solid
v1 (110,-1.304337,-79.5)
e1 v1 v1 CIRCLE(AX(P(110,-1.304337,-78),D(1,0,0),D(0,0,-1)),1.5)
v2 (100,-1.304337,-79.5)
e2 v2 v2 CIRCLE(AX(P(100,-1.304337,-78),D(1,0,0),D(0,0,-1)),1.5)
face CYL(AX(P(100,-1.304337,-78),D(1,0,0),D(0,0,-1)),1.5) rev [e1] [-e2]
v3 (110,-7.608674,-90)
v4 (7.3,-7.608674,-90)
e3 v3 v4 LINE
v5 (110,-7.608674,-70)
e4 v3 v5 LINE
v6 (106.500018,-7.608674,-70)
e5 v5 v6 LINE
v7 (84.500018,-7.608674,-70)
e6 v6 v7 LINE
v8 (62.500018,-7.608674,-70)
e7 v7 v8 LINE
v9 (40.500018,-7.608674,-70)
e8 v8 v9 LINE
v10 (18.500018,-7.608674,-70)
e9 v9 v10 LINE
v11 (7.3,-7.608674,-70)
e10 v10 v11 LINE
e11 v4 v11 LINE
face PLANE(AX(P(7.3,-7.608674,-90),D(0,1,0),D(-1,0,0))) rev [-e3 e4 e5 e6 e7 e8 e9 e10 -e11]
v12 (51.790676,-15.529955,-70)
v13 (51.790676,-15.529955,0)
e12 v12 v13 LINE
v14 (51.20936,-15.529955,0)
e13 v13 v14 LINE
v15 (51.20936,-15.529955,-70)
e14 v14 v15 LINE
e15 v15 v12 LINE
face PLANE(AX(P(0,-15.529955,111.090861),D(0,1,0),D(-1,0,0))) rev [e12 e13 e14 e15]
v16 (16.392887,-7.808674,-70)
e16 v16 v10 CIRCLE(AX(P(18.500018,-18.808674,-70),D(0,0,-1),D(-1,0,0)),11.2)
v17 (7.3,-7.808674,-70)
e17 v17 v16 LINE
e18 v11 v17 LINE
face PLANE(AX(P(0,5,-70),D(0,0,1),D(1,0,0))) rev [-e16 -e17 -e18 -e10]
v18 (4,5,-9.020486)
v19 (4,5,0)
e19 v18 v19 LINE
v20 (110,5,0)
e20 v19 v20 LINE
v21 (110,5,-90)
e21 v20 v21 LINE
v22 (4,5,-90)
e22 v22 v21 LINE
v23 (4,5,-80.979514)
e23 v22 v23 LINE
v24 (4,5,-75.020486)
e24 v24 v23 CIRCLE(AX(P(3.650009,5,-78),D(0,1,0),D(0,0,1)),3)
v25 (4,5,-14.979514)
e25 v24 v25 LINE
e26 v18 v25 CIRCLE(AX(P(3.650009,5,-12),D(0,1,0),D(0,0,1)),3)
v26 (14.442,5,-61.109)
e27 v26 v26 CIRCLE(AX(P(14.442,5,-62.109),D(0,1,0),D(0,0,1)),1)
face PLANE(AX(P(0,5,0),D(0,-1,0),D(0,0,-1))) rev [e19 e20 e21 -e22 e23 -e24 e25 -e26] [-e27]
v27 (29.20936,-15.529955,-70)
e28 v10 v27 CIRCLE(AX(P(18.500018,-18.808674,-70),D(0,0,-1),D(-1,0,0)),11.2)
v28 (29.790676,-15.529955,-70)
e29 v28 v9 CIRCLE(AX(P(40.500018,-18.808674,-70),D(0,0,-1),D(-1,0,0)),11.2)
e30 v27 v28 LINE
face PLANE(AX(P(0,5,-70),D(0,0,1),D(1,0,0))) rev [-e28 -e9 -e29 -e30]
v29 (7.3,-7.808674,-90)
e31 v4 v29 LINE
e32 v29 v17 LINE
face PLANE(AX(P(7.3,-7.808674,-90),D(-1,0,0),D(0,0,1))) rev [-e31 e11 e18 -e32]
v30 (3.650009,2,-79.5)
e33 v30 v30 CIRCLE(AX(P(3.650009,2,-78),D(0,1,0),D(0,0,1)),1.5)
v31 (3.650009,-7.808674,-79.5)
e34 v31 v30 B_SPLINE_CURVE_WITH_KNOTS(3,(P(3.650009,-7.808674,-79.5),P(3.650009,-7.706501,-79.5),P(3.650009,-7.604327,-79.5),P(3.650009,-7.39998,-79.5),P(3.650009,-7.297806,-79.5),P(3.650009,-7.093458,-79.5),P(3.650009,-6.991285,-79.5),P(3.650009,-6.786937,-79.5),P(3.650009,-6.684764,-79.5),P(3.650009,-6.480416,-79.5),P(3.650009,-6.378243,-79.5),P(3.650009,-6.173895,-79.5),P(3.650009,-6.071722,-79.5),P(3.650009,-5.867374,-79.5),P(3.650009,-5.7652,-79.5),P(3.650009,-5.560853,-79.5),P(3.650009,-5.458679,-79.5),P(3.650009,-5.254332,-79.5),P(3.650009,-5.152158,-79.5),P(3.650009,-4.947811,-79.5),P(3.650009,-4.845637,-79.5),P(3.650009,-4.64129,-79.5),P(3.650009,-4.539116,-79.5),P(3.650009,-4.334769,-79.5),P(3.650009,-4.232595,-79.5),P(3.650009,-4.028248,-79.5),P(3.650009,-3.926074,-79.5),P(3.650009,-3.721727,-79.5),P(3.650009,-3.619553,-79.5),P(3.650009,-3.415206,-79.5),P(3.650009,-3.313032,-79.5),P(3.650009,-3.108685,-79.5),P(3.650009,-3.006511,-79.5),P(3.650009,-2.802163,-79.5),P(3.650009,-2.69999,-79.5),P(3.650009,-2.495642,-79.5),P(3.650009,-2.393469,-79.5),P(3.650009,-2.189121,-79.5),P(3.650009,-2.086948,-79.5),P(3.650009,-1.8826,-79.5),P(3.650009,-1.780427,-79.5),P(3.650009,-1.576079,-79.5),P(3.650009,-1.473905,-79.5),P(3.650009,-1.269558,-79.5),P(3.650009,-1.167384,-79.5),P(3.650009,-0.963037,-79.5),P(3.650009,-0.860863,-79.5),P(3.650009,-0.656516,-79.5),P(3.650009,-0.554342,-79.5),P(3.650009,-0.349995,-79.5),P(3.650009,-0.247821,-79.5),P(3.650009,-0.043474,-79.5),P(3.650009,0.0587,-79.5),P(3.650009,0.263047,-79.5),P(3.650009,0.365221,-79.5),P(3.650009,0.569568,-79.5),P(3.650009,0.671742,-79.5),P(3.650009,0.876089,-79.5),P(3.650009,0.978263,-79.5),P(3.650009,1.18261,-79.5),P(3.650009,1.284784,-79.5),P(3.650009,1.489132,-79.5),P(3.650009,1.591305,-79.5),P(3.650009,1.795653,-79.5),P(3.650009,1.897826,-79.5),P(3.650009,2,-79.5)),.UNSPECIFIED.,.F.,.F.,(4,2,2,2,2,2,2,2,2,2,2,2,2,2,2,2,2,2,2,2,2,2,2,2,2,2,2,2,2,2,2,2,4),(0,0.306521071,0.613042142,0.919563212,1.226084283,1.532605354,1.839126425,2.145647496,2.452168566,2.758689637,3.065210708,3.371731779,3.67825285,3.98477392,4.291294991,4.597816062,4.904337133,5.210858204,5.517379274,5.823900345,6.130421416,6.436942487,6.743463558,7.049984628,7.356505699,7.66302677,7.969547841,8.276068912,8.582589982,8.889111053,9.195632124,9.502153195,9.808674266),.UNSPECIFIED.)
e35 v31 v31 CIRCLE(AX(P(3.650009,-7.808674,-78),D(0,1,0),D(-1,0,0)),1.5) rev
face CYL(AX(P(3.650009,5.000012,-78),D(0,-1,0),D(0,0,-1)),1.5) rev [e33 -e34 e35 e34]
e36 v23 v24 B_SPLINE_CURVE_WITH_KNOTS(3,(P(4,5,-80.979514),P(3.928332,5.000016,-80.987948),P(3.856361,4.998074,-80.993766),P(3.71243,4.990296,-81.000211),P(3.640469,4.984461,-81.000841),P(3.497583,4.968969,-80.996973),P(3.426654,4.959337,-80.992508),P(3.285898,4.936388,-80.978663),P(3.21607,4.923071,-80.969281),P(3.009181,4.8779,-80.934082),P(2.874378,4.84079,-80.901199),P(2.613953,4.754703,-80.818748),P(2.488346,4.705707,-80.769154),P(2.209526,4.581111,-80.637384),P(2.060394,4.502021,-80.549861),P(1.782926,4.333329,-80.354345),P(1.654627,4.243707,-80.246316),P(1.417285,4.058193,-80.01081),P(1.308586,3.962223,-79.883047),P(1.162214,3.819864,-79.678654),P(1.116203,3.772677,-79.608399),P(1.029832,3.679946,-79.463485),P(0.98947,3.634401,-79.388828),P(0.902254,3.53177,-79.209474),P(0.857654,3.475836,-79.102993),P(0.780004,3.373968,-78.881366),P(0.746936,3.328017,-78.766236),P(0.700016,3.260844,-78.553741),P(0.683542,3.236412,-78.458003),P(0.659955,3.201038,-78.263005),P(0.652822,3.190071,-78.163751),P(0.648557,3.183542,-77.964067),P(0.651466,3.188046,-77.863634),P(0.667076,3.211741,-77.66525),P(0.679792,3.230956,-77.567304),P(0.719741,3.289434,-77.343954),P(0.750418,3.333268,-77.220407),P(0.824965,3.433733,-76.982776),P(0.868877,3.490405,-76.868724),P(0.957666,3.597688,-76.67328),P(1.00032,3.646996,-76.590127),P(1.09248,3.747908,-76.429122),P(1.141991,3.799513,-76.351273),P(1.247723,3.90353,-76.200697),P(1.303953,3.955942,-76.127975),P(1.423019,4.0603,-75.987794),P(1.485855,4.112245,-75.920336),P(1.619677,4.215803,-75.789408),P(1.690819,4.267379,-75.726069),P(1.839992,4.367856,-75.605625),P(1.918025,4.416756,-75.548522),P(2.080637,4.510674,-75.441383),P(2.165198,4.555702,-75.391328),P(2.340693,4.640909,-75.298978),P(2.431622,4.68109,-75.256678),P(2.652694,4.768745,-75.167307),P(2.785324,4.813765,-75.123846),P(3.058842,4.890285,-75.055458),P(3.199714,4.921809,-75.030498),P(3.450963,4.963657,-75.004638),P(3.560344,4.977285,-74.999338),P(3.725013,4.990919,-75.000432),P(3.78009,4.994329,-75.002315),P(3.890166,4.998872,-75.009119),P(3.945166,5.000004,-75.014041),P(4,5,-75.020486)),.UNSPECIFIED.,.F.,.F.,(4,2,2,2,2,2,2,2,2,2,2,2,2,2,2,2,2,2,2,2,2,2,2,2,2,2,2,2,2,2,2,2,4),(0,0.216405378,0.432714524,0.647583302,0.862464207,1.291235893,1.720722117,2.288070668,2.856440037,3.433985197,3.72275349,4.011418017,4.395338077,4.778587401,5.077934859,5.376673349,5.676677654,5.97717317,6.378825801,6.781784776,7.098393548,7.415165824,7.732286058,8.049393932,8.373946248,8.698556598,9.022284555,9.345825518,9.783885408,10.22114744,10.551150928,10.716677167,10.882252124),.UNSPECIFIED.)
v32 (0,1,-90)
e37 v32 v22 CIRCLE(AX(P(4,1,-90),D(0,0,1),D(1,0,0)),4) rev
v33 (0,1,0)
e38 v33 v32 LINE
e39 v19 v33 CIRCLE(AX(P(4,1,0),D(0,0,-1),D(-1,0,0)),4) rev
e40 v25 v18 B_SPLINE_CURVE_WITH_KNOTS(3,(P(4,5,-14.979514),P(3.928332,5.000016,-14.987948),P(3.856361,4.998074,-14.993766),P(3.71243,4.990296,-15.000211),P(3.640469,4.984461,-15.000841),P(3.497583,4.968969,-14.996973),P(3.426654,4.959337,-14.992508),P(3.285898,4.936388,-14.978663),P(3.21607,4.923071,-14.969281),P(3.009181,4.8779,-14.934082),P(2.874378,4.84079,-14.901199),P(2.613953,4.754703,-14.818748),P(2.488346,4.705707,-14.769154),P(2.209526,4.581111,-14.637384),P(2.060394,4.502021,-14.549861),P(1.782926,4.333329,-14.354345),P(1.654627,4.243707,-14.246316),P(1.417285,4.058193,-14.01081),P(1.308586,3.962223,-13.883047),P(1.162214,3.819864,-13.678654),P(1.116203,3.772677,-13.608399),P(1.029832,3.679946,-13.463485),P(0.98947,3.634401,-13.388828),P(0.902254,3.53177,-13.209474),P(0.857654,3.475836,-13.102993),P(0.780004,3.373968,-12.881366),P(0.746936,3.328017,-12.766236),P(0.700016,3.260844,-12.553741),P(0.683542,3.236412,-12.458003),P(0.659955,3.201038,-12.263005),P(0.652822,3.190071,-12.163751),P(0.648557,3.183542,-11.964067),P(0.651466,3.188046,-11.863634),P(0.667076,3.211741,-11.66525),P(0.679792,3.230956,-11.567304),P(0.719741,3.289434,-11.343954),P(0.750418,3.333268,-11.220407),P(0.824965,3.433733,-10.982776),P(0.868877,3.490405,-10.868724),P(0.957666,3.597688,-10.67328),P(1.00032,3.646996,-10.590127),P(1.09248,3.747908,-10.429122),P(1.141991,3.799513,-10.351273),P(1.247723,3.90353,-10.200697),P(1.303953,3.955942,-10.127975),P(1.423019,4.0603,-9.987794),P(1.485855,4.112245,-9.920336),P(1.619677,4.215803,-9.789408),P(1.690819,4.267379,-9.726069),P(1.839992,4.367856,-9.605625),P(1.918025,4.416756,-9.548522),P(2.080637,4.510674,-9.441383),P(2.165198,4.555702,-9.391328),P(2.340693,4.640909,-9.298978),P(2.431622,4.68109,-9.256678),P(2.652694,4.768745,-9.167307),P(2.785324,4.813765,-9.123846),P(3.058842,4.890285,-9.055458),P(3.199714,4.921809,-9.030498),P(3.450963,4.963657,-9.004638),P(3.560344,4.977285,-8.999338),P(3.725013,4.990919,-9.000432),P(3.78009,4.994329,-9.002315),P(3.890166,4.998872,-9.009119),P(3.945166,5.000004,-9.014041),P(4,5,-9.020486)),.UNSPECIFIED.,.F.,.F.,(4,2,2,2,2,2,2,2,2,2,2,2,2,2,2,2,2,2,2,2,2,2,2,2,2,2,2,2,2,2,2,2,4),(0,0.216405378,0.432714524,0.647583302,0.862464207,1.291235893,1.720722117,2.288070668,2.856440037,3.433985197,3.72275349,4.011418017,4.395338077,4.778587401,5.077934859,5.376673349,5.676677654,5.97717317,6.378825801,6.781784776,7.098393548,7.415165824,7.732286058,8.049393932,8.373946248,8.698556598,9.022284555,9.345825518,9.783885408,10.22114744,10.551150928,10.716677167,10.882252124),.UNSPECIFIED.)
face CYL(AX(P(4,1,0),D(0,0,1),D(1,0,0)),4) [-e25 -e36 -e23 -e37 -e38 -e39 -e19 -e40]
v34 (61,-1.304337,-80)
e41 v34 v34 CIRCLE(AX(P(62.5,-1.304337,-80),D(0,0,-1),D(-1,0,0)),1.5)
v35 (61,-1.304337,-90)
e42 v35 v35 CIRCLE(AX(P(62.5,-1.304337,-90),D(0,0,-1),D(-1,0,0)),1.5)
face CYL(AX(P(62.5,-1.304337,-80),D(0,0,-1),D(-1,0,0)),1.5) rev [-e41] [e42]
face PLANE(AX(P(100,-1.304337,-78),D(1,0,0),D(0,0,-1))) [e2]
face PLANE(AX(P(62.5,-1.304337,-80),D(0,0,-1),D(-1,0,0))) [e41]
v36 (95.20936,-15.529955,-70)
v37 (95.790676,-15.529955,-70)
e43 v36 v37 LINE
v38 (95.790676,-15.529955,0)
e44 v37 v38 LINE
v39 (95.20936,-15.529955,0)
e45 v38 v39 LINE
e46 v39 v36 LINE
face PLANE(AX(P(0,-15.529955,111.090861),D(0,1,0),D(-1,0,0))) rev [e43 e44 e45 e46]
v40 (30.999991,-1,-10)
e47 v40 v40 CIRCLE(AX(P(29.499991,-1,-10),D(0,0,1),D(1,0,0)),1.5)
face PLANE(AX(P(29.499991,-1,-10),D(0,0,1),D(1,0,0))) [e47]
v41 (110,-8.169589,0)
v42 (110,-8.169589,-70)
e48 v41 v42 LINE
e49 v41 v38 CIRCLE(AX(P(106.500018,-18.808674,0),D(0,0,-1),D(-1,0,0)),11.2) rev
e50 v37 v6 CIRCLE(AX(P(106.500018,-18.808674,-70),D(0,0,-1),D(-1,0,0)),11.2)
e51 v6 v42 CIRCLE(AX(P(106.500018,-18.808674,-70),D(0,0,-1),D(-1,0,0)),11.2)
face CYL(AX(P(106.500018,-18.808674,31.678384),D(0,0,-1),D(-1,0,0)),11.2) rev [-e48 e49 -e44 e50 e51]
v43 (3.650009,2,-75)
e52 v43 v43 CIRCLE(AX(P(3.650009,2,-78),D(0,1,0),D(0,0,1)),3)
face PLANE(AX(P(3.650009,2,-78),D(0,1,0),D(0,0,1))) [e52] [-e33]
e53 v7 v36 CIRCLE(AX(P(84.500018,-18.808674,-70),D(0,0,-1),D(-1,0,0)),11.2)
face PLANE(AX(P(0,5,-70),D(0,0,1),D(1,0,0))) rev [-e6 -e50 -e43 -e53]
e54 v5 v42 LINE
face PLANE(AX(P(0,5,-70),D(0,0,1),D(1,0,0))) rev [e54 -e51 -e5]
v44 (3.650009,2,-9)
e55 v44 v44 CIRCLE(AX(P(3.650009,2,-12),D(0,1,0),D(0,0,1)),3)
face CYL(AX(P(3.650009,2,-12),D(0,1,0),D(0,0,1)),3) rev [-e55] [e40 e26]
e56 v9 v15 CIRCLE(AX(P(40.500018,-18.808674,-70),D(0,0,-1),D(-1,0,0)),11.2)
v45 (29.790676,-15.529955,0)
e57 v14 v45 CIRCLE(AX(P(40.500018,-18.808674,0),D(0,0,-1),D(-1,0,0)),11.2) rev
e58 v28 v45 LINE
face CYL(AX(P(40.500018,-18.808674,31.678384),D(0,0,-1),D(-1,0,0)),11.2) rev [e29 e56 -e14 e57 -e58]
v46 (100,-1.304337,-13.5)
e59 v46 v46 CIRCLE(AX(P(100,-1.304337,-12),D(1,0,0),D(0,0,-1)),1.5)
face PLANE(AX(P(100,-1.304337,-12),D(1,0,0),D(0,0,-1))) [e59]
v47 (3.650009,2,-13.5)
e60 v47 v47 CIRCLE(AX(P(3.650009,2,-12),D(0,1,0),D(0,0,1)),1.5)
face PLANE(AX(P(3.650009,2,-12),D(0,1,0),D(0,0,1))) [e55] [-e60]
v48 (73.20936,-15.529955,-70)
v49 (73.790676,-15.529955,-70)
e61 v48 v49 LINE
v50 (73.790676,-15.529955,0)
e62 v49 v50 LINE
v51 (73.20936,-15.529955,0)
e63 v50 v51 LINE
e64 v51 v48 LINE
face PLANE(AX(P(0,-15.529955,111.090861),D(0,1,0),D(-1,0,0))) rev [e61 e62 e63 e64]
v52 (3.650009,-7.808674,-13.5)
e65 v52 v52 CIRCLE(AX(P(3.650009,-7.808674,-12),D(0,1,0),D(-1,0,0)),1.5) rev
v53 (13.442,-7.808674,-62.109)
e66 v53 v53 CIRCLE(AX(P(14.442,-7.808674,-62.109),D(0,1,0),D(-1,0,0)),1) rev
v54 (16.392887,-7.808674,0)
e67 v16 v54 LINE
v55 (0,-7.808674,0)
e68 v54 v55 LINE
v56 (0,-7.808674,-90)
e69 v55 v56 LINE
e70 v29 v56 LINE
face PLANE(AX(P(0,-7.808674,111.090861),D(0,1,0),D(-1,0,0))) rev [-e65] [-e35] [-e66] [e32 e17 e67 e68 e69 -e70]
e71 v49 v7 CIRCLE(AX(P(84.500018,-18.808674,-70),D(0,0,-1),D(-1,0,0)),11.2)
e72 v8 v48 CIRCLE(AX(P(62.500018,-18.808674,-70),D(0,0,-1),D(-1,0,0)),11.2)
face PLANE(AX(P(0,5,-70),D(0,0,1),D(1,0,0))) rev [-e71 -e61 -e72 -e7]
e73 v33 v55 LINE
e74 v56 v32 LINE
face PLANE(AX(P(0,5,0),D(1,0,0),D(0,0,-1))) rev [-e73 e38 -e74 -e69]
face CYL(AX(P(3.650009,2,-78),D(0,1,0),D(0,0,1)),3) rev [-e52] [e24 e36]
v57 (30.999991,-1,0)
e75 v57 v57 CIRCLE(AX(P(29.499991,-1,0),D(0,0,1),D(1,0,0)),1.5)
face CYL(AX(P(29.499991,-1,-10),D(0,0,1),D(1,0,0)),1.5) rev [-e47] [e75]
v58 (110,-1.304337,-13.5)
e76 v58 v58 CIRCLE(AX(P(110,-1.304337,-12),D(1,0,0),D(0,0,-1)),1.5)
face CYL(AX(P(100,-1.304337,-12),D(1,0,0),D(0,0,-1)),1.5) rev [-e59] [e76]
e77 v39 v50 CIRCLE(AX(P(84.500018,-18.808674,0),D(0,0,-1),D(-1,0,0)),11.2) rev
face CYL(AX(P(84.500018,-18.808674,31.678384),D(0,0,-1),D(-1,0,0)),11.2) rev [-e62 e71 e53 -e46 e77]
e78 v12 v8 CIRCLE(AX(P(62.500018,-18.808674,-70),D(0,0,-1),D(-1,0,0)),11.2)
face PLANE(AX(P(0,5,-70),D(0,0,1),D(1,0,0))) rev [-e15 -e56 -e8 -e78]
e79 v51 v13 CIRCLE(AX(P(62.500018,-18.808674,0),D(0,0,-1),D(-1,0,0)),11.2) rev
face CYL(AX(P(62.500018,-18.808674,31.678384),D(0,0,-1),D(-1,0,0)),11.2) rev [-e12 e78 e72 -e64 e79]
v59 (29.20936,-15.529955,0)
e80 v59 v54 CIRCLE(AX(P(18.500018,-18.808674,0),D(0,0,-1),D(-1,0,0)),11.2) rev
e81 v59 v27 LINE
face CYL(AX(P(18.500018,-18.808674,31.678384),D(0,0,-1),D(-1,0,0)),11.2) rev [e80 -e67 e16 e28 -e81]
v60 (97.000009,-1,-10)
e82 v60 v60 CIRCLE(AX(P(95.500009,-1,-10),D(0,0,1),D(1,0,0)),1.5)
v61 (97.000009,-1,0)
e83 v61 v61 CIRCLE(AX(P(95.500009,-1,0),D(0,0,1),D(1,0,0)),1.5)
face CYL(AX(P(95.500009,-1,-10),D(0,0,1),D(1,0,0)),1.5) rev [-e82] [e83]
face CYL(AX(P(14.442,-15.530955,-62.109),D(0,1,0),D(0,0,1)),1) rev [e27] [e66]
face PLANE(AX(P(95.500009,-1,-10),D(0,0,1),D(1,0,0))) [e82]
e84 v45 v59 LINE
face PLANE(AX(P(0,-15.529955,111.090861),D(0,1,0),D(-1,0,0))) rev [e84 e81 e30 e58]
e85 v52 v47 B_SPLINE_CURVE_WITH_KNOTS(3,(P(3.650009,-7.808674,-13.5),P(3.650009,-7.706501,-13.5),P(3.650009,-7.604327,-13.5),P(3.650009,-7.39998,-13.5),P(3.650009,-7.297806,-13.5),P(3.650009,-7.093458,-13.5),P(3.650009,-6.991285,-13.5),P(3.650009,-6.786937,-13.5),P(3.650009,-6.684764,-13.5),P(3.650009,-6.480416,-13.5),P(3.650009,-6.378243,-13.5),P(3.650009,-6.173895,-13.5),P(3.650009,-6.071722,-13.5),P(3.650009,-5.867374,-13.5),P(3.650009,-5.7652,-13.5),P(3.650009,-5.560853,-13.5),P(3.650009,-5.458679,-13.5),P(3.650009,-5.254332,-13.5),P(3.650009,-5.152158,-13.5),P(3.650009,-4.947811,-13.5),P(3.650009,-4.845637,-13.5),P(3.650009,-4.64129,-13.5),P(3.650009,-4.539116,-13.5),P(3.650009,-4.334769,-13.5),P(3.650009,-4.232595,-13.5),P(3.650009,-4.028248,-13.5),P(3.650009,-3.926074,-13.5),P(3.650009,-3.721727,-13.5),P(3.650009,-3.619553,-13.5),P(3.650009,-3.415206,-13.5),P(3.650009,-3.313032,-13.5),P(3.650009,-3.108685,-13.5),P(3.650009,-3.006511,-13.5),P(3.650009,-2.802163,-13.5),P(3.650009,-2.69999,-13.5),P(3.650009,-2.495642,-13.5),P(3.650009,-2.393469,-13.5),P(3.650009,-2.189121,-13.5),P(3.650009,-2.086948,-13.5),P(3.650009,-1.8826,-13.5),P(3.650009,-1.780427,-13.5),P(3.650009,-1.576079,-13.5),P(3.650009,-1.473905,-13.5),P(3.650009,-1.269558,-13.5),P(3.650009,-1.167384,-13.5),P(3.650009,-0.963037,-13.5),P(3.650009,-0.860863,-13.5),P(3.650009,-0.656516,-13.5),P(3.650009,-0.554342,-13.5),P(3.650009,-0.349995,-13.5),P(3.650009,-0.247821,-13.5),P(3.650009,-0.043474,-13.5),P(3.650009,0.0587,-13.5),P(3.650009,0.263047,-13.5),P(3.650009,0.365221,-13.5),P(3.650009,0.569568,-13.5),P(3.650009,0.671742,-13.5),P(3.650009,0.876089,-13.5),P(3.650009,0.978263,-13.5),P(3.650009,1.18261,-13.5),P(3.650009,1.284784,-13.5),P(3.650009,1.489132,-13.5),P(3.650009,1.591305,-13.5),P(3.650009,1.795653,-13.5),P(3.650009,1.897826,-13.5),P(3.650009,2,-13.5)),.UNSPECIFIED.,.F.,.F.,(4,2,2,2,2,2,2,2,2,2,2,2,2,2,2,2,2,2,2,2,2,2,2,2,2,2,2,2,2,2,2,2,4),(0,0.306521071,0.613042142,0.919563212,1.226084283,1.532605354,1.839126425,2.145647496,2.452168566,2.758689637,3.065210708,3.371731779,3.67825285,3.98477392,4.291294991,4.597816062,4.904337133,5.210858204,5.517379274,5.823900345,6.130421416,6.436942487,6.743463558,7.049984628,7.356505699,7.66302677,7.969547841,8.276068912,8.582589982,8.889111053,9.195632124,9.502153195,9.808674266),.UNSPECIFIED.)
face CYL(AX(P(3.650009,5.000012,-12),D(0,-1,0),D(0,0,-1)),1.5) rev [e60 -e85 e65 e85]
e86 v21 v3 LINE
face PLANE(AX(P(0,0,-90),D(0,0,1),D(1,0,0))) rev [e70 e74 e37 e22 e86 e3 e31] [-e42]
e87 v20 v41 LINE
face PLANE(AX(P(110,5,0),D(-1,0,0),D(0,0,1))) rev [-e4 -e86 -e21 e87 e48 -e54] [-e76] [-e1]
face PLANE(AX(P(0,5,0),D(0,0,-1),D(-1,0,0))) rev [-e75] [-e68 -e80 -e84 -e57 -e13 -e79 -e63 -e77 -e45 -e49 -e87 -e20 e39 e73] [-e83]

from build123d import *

# Parameters (mm, degrees)
SKETCH_1_W                      = 110
SKETCH_1_H                      = 70
EXTRUDE_1_DEPTH                 = 5
EXTRUDE_2_DEPTH                 = 70
CUT_EXTRUDE_2_DEPTH             = 70
EXTRUDE_3_DEPTH                 = 20
SKETCH_5_R                      = 1.5
CUT_EXTRUDE_3_DEPTH             = 10
SKETCH_6_R                      = 1.5
CUT_EXTRUDE_4_DEPTH             = 10
CUT_EXTRUDE_5_REACH             = 145.602
SKETCH_7_R                      = 1.5
CUT_EXTRUDE_5_DIRECTION_2_DEPTH = 144.601807274
SKETCH_8_R                      = 3
CUT_EXTRUDE_6_DEPTH             = 3
CUT_EXTRUDE_7_REACH             = 145.602
SKETCH_9_R                      = 1
FILLET_1_R                      = 4
SKETCH_10_R                     = 1.5
CUT_EXTRUDE_8_DEPTH             = 10


with BuildPart() as part:
    # 草图1 → 凸台-拉伸1 (new body)
    with BuildSketch(Plane(origin=(0, 0, 0), x_dir=(1, 0, 0), z_dir=(0, 1, 0))):
        with Locations((55, 35)):
            Rectangle(SKETCH_1_W, SKETCH_1_H)
    extrude(amount=EXTRUDE_1_DEPTH)

    # 草图2 → 凸台-拉伸2 (add)
    with BuildSketch(Plane(origin=(0, 0, -70), x_dir=(-1, 0, 0), z_dir=(0, 0, -1))):
        with BuildLine():
            Line((0, 0), (-110, 0))
            Line((-110, 0), (-110, -8.38034143))
            ThreePointArc((-110, -8.38034143), (-101.497088177, -9.012210946), (-96.000017961, -15.529955003))
            Line((-96.000017961, -15.529955003), (-94.999994392, -15.529955003))
            ThreePointArc((-94.999994392, -15.529955003), (-84.5, -7.808692226), (-74.000005608, -15.529955003))
            Line((-74.000005608, -15.529955003), (-72.999994392, -15.529955003))
            ThreePointArc((-72.999994392, -15.529955003), (-62.5, -7.808692226), (-52.000005608, -15.529955003))
            Line((-52.000005608, -15.529955003), (-50.999994392, -15.529955003))
            ThreePointArc((-50.999994392, -15.529955003), (-40.5, -7.808692226), (-30.000005608, -15.529955003))
            Line((-30.000005608, -15.529955003), (-29.000017961, -15.529955003))
            ThreePointArc((-29.000017961, -15.529955003), (-25.01669227, -9.946792076), (-18.500017961, -7.808674266))
            Line((-18.500017961, -7.808674266), (0, -7.808674266))
            Line((0, -7.808674266), (0, 0))
        make_face()
    extrude(amount=-EXTRUDE_2_DEPTH)

    # 草图3 → 切除-拉伸2 (cut)
    with BuildSketch(Plane(origin=(0, 0, -70), x_dir=(-1, 0, 0), z_dir=(0, 0, -1))):
        with BuildLine():
            Line((-96.000017961, -15.529955003), (-95.790676244, -15.529955003))
            ThreePointArc((-95.790676244, -15.529955003), (-101.348565543, -8.863698751), (-110, -8.169589449))
            Line((-110, -8.169589449), (-110, -8.38034143))
            ThreePointArc((-110, -8.38034143), (-101.497088177, -9.012210946), (-96.000017961, -15.529955003))
        make_face()
        with BuildLine():
            ThreePointArc((-73.790676244, -15.529955003), (-84.500017961, -7.608674266), (-95.209359677, -15.529955003))
            Line((-95.209359677, -15.529955003), (-94.999994392, -15.529955003))
            ThreePointArc((-94.999994392, -15.529955003), (-84.5, -7.808692226), (-74.000005608, -15.529955003))
            Line((-74.000005608, -15.529955003), (-73.790676244, -15.529955003))
        make_face()
        with BuildLine():
            ThreePointArc((-51.790676244, -15.529955003), (-62.500017961, -7.608674266), (-73.209359677, -15.529955003))
            Line((-73.209359677, -15.529955003), (-72.999994392, -15.529955003))
            ThreePointArc((-72.999994392, -15.529955003), (-62.5, -7.808692226), (-52.000005608, -15.529955003))
            Line((-52.000005608, -15.529955003), (-51.790676244, -15.529955003))
        make_face()
        with BuildLine():
            ThreePointArc((-29.790676244, -15.529955003), (-40.500017961, -7.608674266), (-51.209359677, -15.529955003))
            Line((-51.209359677, -15.529955003), (-50.999994392, -15.529955003))
            ThreePointArc((-50.999994392, -15.529955003), (-40.5, -7.808692226), (-30.000005608, -15.529955003))
            Line((-30.000005608, -15.529955003), (-29.790676244, -15.529955003))
        make_face()
        with BuildLine():
            Line((-18.500017961, -7.808674266), (-16.39288721, -7.808674266))
            ThreePointArc((-16.39288721, -7.808674266), (-24.279641861, -9.215137505), (-29.209359677, -15.529955003))
            Line((-29.209359677, -15.529955003), (-29.000017961, -15.529955003))
            ThreePointArc((-29.000017961, -15.529955003), (-25.01669227, -9.946792076), (-18.500017961, -7.808674266))
        make_face()
    extrude(amount=-CUT_EXTRUDE_2_DEPTH, mode=Mode.SUBTRACT)

    # 草图4 → 凸台-拉伸3 (add)
    with BuildSketch(Plane(origin=(0, 0, -70), x_dir=(-1, 0, 0), z_dir=(0, 0, -1))):
        Polygon((0, 5), (-110, 5), (-110, -7.608674266), (-7.3, -7.608674266), (-7.3, -7.808674266), (0, -7.808674266), (0, -7.608674266), align=None)
    extrude(amount=EXTRUDE_3_DEPTH)

    # 草图5 → 切除-拉伸3 (cut)
    with BuildSketch(Plane.XY):
        with Locations((95.50000898, -1)):
            Circle(SKETCH_5_R)
        with Locations((29.49999102, -1)):
            Circle(SKETCH_5_R)
    extrude(amount=-CUT_EXTRUDE_3_DEPTH, mode=Mode.SUBTRACT)

    # 草图6 → 切除-拉伸4 (cut)
    with BuildSketch(Plane(origin=(110, 0, 0), x_dir=(0, 0, -1), z_dir=(1, 0, 0))):
        with Locations((78, -1.304337133)):
            Circle(SKETCH_6_R)
        with Locations((12, -1.304337133)):
            Circle(SKETCH_6_R)
    extrude(amount=-CUT_EXTRUDE_4_DEPTH, mode=Mode.SUBTRACT)

    # 草图7 → 切除-拉伸5 (cut, up to next)
    with BuildSketch(Plane(origin=(0, 5, 0), x_dir=(1, 0, 0), z_dir=(0, 1, 0)), mode=Mode.PRIVATE) as cut_extrude_5_sk1:
        with Locations(Location((3.65000898, 78, 0), (0, 0, 90))):
            Circle(SKETCH_7_R)
    cut_extrude_5_tool1 = extrude(cut_extrude_5_sk1.sketch, amount=-CUT_EXTRUDE_5_REACH, mode=Mode.PRIVATE) & part.part
    # 草图7 → 切除-拉伸5 (cut, up to next)
    with BuildSketch(Plane(origin=(0, 5, 0), x_dir=(1, 0, 0), z_dir=(0, 1, 0)), mode=Mode.PRIVATE) as cut_extrude_5_sk2:
        with Locations(Location((3.65000898, 12, 0), (0, 0, 90))):
            Circle(SKETCH_7_R)
    cut_extrude_5_tool2 = extrude(cut_extrude_5_sk2.sketch, amount=-CUT_EXTRUDE_5_REACH, mode=Mode.PRIVATE) & part.part
    add(cut_extrude_5_tool1.solids().sort_by_distance((3.650009, 5, -78))[0], mode=Mode.SUBTRACT)
    add(cut_extrude_5_tool2.solids().sort_by_distance((3.650009, 5, -12))[0], mode=Mode.SUBTRACT)

    # 草图7 → 切除-拉伸5 direction 2 (cut)
    with BuildSketch(Plane(origin=(0, 5, 0), x_dir=(1, 0, 0), z_dir=(0, 1, 0))):
        with Locations(Location((3.65000898, 78, 0), (0, 0, 90))):
            Circle(SKETCH_7_R)
        with Locations(Location((3.65000898, 12, 0), (0, 0, 90))):
            Circle(SKETCH_7_R)
    extrude(amount=CUT_EXTRUDE_5_DIRECTION_2_DEPTH, mode=Mode.SUBTRACT)

    # 草图8 → 切除-拉伸6 (cut)
    with BuildSketch(Plane(origin=(0, 5, 0), x_dir=(1, 0, 0), z_dir=(0, 1, 0))):
        with Locations(Location((3.65000898, 12, 0), (0, 0, 270))):
            Circle(SKETCH_8_R)
        with Locations(Location((3.65000898, 78, 0), (0, 0, 270))):
            Circle(SKETCH_8_R)
    extrude(amount=-CUT_EXTRUDE_6_DEPTH, mode=Mode.SUBTRACT)

    # 草图9 → 切除-拉伸7 (cut, up to next)
    with BuildSketch(Plane(origin=(0, 5, 0), x_dir=(1, 0, 0), z_dir=(0, 1, 0)), mode=Mode.PRIVATE) as cut_extrude_7_sk1:
        with Locations(Location((14.442, 62.109, 0), (0, 0, 270))):
            Circle(SKETCH_9_R)
    cut_extrude_7_tool1 = extrude(cut_extrude_7_sk1.sketch, amount=-CUT_EXTRUDE_7_REACH, mode=Mode.PRIVATE) & part.part
    add(cut_extrude_7_tool1.solids().sort_by_distance((14.442, 5, -62.109))[0], mode=Mode.SUBTRACT)

    # 圆角1
    # the kernel refuses this fillet: 4 mm, written as the material it takes off along each edge
    with BuildSketch(Plane(origin=(0, 5, 10), x_dir=(0, -1, 0), z_dir=(0, 0, -1))) as fillet_1_piece_1:
        with BuildLine():
            CenterArc((FILLET_1_R, -FILLET_1_R), FILLET_1_R, 90, 90)
            Line((0, -FILLET_1_R), (0, 0))
            Line((0, 0), (FILLET_1_R, 0))
        make_face()
    extrude(amount=110, mode=Mode.SUBTRACT)

    # 草图10 → 切除-拉伸8 (cut)
    with BuildSketch(Plane(origin=(0, 0, -90), x_dir=(-1, 0, 0), z_dir=(0, 0, -1))):
        with Locations((-62.5, -1.304337133)):
            Circle(SKETCH_10_R)
    extrude(amount=-CUT_EXTRUDE_8_DEPTH, mode=Mode.SUBTRACT)


solid = part.part
